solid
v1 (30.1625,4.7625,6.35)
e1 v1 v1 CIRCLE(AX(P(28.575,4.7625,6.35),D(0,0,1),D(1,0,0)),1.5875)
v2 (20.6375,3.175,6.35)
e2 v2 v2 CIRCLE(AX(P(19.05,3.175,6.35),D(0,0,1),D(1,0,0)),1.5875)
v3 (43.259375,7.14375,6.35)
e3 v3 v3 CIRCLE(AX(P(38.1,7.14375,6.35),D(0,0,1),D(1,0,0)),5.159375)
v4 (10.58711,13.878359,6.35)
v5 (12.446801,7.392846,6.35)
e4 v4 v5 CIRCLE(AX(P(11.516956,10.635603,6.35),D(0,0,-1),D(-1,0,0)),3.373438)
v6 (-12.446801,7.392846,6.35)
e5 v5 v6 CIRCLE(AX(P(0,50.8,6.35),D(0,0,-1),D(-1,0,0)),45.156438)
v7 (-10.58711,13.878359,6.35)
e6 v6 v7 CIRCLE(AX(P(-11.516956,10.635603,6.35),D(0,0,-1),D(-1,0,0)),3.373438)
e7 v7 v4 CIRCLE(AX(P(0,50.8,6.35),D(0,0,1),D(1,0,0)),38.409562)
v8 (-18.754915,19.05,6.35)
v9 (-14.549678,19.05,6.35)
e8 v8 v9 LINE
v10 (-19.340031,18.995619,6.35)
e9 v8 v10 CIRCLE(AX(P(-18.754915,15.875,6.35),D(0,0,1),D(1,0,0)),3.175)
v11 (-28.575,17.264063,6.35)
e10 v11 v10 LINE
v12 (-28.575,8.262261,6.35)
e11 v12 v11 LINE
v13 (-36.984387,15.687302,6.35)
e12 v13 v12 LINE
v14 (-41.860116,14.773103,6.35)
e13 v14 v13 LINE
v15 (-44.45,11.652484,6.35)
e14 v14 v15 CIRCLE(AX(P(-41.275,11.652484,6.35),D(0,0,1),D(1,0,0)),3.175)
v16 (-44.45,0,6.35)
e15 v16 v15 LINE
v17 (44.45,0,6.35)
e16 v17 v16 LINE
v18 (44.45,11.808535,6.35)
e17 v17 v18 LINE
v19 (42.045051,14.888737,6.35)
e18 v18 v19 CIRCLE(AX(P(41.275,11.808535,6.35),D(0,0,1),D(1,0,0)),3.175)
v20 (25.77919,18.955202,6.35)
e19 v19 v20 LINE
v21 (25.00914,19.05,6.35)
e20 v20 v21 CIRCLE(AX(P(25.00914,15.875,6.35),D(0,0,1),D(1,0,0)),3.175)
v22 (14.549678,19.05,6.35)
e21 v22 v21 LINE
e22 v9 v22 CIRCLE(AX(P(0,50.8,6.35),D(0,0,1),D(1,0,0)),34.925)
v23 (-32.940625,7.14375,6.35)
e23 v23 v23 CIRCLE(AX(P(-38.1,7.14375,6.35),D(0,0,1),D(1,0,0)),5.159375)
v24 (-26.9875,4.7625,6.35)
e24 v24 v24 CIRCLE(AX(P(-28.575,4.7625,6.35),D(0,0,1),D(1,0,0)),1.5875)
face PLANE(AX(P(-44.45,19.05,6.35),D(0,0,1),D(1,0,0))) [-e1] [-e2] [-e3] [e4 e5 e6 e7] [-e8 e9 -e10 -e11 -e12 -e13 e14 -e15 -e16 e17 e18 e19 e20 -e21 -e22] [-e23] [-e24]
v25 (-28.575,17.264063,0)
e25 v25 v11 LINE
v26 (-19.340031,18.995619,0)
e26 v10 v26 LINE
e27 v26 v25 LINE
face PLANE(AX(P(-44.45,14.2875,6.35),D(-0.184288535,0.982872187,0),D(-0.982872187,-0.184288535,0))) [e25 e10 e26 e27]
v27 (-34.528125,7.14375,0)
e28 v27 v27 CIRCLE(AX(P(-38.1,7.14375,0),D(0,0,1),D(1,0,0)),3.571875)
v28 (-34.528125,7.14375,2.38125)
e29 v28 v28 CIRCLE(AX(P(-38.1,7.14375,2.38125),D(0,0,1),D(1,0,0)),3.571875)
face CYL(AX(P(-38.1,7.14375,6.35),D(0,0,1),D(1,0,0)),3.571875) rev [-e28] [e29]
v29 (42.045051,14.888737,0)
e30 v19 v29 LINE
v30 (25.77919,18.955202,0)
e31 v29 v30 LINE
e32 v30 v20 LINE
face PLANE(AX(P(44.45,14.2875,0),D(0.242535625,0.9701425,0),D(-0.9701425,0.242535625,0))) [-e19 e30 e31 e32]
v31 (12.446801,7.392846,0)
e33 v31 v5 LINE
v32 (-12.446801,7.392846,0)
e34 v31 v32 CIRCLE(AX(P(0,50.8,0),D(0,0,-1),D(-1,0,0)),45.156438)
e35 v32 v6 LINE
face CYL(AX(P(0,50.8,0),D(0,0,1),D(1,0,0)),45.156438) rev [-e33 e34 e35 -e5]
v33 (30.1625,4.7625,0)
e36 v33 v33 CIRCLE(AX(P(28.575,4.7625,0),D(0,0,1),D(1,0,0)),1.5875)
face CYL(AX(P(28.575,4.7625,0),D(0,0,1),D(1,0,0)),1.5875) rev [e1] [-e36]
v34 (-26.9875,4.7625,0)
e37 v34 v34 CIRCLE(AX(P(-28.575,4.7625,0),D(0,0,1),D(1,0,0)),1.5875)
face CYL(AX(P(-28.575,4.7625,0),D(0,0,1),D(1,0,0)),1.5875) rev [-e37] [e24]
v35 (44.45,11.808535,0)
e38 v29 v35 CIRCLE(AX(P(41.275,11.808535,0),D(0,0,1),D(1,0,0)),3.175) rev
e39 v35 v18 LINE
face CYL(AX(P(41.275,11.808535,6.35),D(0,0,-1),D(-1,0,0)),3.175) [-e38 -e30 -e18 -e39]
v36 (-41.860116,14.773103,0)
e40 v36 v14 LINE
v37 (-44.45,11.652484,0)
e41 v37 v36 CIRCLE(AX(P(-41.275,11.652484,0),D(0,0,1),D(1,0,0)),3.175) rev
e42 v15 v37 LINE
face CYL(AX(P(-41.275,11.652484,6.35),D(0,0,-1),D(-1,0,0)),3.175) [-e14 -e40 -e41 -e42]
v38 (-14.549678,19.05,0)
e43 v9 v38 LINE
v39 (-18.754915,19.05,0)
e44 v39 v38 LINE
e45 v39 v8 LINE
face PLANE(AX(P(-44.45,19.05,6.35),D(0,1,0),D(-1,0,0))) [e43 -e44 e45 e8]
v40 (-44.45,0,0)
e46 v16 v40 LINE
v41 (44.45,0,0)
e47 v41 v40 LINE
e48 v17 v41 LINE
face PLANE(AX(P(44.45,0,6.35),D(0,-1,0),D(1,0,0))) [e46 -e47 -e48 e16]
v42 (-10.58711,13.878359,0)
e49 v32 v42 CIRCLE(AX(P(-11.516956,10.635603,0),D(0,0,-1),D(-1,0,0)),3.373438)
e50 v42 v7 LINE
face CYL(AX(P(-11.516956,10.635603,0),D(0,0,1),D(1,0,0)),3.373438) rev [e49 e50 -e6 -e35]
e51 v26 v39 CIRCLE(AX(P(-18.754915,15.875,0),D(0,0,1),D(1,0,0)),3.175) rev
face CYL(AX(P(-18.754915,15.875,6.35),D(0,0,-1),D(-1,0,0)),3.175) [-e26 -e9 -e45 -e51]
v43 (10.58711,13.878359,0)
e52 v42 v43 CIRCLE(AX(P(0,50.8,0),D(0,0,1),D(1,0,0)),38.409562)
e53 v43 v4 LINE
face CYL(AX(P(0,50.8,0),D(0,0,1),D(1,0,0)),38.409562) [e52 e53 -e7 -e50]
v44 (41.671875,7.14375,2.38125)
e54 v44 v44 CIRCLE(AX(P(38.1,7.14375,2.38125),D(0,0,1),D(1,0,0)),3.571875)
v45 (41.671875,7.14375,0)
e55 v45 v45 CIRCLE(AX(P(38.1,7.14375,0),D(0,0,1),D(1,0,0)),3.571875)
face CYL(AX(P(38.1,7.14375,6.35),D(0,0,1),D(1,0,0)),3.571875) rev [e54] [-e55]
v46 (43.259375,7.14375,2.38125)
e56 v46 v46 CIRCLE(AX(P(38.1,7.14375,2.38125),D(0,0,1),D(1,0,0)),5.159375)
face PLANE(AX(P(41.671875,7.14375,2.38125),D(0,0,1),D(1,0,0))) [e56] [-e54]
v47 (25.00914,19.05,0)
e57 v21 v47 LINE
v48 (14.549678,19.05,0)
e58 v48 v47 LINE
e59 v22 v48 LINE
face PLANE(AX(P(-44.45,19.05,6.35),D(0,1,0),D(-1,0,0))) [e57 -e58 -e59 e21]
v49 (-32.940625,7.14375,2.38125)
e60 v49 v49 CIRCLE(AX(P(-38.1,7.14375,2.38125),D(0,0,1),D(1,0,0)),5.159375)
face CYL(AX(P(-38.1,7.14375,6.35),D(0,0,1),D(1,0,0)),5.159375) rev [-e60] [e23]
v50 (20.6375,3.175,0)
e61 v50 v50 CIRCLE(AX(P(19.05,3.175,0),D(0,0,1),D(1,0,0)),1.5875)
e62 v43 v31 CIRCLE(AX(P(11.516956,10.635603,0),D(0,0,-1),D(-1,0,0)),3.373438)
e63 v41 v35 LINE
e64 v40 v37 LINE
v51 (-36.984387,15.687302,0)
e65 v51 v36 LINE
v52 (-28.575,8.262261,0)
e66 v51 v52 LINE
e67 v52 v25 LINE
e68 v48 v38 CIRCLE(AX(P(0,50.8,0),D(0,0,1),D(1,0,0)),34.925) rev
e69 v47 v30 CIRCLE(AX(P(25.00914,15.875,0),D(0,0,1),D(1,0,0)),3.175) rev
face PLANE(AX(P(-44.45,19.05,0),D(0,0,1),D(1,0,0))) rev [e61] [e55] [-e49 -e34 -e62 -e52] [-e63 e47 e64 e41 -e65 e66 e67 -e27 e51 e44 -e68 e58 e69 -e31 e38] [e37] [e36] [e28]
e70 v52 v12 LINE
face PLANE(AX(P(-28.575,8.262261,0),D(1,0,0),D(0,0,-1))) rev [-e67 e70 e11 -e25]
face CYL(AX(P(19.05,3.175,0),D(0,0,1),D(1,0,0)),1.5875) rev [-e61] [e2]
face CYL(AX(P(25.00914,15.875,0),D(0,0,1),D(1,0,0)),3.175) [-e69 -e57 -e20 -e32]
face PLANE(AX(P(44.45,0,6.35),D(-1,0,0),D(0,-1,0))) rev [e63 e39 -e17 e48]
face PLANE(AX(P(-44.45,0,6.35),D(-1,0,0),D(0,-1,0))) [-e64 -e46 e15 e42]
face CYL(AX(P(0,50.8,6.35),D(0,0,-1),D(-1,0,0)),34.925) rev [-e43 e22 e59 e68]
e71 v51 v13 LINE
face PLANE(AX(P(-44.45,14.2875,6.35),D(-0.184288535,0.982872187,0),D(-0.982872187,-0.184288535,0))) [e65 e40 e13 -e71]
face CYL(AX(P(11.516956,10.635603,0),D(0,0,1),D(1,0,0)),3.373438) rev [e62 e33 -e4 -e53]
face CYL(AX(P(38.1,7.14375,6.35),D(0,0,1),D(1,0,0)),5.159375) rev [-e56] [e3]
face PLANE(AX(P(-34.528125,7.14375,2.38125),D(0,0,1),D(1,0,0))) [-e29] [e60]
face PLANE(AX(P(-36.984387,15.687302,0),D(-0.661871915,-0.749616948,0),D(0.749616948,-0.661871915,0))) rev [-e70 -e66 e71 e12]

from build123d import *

# Parameters (mm, degrees)
SKETCH1_W          = 88.9
SKETCH1_H          = 19.05
BASE_EXTRUDE_DEPTH = 6.35
CUT_EXTRUDE1_DEPTH = 49.775275499
CUT_EXTRUDE2_DEPTH = 49.775275499
CUT_EXTRUDE3_DEPTH = 49.775275499
CUT_EXTRUDE4_DEPTH = 49.775275499
CUT_EXTRUDE5_DEPTH = 49.775275499
FILLET1_R          = 3.175
HOLE1_D            = 7.14375
HOLE1_CBORE_D      = 10.31875
HOLE1_CBORE_DEPTH  = 3.96875
LPATTERN1_COUNT    = 2
LPATTERN1_PITCH    = 76.2
HOLE2_OUTLINE_R    = 1.5875
HOLE2_DEPTH        = 6.35
HOLE3_OUTLINE_R    = 1.5875
HOLE3_DEPTH        = 6.35
LPATTERN2_COUNT    = 2
LPATTERN2_PITCH    = 57.15


# Read off the part's stored shape, not the designer's step: Hole2, Hole3
with BuildPart() as part:
    # Sketch1 → Base-Extrude (new body)
    with BuildSketch(Plane.XY):
        with Locations((0, 9.525)):
            Rectangle(SKETCH1_W, SKETCH1_H)
    extrude(amount=BASE_EXTRUDE_DEPTH)

    # Sketch2 → Cut-Extrude1 (cut, through all)
    with BuildSketch(Plane.XY.offset(6.35)):
        Polygon((44.45, 14.2875), (25.4, 19.05), (44.45, 19.05), align=None)
    extrude(amount=-CUT_EXTRUDE1_DEPTH, mode=Mode.SUBTRACT)

    # Sketch3 → Cut-Extrude2 (cut, through all)
    with BuildSketch(Plane.XY.offset(6.35)):
        with BuildLine():
            Line((-136.365872597, 74.873193339), (-14.549677831, 19.05))
            ThreePointArc((-14.549677831, 19.05), (0, 15.875), (14.549677831, 19.05))
            Line((14.549677831, 19.05), (136.365872597, 74.873193339))
            Line((136.365872597, 74.873193339), (136.365872597, 342.868821823))
            Line((136.365872597, 342.868821823), (-136.365872597, 342.868821823))
            Line((-136.365872597, 342.868821823), (-136.365872597, 74.873193339))
        make_face()
    extrude(amount=-CUT_EXTRUDE2_DEPTH, mode=Mode.SUBTRACT)

    # Sketch4 → Cut-Extrude3 (cut, through all)
    with BuildSketch(Plane.XY.offset(6.35)):
        Polygon((-231.275885049, -20.742353447), (-44.45, 14.2875), (-19.05, 19.05), (167.775885049, 54.079853447), (97.716178156, 427.731623544), (-301.335591942, 352.909416651), align=None)
    extrude(amount=-CUT_EXTRUDE3_DEPTH, mode=Mode.SUBTRACT)

    # Sketch5 → Cut-Extrude4 (cut, through all)
    with BuildSketch(Plane.XY.offset(6.35)):
        Polygon((-36.984386732, 15.687302488), (-28.575, 8.262261056), (-28.575, 17.2640625), align=None)
    extrude(amount=-CUT_EXTRUDE4_DEPTH, mode=Mode.SUBTRACT)

    # Sketch6 → Cut-Extrude5 (cut, through all)
    with BuildSketch(Plane.XY.offset(6.35)):
        with BuildLine():
            ThreePointArc((-10.587110246, 13.878358811), (0, 12.3904375), (10.587110246, 13.878358811))
            ThreePointArc((10.587110246, 13.878358811), (14.75971189, 11.565447951), (12.446801031, 7.392846306))
            ThreePointArc((12.446801031, 7.392846306), (0, 5.6435625), (-12.446801031, 7.392846306))
            ThreePointArc((-12.446801031, 7.392846306), (-14.75971189, 11.565447951), (-10.587110246, 13.878358811))
        make_face()
    extrude(amount=-CUT_EXTRUDE5_DEPTH, mode=Mode.SUBTRACT)

    # Fillet1
    fillet1_edges = [part.edges().sort_by_distance(p)[0] for p in [
        (44.45, 14.2875, 3.175),
        (25.4, 19.05, 3.175),
        (-19.05, 19.05, 3.175),
        (-44.45, 14.2875, 3.175),
    ]]
    fillet(fillet1_edges, radius=FILLET1_R)

    # Hole1 (through all)
    with Locations(Plane.XY.offset(6.35)):
        with Locations((38.1, 7.14375)):
            hole1 = CounterBoreHole(HOLE1_D / 2, HOLE1_CBORE_D / 2, HOLE1_CBORE_DEPTH)

    # LPattern1: Hole1 ×2
    with Locations(*[(-i * LPATTERN1_PITCH, 0, 0) for i in range(1, LPATTERN1_COUNT)]):
        add(hole1, mode=Mode.SUBTRACT)

    # Hole2 outline → Hole2 (cut)
    with BuildSketch(Plane.XY):
        with Locations((28.575, 4.7625)):
            Circle(HOLE2_OUTLINE_R)
    hole2 = extrude(amount=HOLE2_DEPTH, mode=Mode.SUBTRACT)

    # Hole3 outline → Hole3 (cut)
    with BuildSketch(Plane.XY):
        with Locations((19.05, 3.175)):
            Circle(HOLE3_OUTLINE_R)
    extrude(amount=HOLE3_DEPTH, mode=Mode.SUBTRACT)

    # LPattern2: Hole2 ×2
    with Locations(*[(-i * LPATTERN2_PITCH, 0, 0) for i in range(1, LPATTERN2_COUNT)]):
        add(hole2, mode=Mode.SUBTRACT)


solid = part.part
